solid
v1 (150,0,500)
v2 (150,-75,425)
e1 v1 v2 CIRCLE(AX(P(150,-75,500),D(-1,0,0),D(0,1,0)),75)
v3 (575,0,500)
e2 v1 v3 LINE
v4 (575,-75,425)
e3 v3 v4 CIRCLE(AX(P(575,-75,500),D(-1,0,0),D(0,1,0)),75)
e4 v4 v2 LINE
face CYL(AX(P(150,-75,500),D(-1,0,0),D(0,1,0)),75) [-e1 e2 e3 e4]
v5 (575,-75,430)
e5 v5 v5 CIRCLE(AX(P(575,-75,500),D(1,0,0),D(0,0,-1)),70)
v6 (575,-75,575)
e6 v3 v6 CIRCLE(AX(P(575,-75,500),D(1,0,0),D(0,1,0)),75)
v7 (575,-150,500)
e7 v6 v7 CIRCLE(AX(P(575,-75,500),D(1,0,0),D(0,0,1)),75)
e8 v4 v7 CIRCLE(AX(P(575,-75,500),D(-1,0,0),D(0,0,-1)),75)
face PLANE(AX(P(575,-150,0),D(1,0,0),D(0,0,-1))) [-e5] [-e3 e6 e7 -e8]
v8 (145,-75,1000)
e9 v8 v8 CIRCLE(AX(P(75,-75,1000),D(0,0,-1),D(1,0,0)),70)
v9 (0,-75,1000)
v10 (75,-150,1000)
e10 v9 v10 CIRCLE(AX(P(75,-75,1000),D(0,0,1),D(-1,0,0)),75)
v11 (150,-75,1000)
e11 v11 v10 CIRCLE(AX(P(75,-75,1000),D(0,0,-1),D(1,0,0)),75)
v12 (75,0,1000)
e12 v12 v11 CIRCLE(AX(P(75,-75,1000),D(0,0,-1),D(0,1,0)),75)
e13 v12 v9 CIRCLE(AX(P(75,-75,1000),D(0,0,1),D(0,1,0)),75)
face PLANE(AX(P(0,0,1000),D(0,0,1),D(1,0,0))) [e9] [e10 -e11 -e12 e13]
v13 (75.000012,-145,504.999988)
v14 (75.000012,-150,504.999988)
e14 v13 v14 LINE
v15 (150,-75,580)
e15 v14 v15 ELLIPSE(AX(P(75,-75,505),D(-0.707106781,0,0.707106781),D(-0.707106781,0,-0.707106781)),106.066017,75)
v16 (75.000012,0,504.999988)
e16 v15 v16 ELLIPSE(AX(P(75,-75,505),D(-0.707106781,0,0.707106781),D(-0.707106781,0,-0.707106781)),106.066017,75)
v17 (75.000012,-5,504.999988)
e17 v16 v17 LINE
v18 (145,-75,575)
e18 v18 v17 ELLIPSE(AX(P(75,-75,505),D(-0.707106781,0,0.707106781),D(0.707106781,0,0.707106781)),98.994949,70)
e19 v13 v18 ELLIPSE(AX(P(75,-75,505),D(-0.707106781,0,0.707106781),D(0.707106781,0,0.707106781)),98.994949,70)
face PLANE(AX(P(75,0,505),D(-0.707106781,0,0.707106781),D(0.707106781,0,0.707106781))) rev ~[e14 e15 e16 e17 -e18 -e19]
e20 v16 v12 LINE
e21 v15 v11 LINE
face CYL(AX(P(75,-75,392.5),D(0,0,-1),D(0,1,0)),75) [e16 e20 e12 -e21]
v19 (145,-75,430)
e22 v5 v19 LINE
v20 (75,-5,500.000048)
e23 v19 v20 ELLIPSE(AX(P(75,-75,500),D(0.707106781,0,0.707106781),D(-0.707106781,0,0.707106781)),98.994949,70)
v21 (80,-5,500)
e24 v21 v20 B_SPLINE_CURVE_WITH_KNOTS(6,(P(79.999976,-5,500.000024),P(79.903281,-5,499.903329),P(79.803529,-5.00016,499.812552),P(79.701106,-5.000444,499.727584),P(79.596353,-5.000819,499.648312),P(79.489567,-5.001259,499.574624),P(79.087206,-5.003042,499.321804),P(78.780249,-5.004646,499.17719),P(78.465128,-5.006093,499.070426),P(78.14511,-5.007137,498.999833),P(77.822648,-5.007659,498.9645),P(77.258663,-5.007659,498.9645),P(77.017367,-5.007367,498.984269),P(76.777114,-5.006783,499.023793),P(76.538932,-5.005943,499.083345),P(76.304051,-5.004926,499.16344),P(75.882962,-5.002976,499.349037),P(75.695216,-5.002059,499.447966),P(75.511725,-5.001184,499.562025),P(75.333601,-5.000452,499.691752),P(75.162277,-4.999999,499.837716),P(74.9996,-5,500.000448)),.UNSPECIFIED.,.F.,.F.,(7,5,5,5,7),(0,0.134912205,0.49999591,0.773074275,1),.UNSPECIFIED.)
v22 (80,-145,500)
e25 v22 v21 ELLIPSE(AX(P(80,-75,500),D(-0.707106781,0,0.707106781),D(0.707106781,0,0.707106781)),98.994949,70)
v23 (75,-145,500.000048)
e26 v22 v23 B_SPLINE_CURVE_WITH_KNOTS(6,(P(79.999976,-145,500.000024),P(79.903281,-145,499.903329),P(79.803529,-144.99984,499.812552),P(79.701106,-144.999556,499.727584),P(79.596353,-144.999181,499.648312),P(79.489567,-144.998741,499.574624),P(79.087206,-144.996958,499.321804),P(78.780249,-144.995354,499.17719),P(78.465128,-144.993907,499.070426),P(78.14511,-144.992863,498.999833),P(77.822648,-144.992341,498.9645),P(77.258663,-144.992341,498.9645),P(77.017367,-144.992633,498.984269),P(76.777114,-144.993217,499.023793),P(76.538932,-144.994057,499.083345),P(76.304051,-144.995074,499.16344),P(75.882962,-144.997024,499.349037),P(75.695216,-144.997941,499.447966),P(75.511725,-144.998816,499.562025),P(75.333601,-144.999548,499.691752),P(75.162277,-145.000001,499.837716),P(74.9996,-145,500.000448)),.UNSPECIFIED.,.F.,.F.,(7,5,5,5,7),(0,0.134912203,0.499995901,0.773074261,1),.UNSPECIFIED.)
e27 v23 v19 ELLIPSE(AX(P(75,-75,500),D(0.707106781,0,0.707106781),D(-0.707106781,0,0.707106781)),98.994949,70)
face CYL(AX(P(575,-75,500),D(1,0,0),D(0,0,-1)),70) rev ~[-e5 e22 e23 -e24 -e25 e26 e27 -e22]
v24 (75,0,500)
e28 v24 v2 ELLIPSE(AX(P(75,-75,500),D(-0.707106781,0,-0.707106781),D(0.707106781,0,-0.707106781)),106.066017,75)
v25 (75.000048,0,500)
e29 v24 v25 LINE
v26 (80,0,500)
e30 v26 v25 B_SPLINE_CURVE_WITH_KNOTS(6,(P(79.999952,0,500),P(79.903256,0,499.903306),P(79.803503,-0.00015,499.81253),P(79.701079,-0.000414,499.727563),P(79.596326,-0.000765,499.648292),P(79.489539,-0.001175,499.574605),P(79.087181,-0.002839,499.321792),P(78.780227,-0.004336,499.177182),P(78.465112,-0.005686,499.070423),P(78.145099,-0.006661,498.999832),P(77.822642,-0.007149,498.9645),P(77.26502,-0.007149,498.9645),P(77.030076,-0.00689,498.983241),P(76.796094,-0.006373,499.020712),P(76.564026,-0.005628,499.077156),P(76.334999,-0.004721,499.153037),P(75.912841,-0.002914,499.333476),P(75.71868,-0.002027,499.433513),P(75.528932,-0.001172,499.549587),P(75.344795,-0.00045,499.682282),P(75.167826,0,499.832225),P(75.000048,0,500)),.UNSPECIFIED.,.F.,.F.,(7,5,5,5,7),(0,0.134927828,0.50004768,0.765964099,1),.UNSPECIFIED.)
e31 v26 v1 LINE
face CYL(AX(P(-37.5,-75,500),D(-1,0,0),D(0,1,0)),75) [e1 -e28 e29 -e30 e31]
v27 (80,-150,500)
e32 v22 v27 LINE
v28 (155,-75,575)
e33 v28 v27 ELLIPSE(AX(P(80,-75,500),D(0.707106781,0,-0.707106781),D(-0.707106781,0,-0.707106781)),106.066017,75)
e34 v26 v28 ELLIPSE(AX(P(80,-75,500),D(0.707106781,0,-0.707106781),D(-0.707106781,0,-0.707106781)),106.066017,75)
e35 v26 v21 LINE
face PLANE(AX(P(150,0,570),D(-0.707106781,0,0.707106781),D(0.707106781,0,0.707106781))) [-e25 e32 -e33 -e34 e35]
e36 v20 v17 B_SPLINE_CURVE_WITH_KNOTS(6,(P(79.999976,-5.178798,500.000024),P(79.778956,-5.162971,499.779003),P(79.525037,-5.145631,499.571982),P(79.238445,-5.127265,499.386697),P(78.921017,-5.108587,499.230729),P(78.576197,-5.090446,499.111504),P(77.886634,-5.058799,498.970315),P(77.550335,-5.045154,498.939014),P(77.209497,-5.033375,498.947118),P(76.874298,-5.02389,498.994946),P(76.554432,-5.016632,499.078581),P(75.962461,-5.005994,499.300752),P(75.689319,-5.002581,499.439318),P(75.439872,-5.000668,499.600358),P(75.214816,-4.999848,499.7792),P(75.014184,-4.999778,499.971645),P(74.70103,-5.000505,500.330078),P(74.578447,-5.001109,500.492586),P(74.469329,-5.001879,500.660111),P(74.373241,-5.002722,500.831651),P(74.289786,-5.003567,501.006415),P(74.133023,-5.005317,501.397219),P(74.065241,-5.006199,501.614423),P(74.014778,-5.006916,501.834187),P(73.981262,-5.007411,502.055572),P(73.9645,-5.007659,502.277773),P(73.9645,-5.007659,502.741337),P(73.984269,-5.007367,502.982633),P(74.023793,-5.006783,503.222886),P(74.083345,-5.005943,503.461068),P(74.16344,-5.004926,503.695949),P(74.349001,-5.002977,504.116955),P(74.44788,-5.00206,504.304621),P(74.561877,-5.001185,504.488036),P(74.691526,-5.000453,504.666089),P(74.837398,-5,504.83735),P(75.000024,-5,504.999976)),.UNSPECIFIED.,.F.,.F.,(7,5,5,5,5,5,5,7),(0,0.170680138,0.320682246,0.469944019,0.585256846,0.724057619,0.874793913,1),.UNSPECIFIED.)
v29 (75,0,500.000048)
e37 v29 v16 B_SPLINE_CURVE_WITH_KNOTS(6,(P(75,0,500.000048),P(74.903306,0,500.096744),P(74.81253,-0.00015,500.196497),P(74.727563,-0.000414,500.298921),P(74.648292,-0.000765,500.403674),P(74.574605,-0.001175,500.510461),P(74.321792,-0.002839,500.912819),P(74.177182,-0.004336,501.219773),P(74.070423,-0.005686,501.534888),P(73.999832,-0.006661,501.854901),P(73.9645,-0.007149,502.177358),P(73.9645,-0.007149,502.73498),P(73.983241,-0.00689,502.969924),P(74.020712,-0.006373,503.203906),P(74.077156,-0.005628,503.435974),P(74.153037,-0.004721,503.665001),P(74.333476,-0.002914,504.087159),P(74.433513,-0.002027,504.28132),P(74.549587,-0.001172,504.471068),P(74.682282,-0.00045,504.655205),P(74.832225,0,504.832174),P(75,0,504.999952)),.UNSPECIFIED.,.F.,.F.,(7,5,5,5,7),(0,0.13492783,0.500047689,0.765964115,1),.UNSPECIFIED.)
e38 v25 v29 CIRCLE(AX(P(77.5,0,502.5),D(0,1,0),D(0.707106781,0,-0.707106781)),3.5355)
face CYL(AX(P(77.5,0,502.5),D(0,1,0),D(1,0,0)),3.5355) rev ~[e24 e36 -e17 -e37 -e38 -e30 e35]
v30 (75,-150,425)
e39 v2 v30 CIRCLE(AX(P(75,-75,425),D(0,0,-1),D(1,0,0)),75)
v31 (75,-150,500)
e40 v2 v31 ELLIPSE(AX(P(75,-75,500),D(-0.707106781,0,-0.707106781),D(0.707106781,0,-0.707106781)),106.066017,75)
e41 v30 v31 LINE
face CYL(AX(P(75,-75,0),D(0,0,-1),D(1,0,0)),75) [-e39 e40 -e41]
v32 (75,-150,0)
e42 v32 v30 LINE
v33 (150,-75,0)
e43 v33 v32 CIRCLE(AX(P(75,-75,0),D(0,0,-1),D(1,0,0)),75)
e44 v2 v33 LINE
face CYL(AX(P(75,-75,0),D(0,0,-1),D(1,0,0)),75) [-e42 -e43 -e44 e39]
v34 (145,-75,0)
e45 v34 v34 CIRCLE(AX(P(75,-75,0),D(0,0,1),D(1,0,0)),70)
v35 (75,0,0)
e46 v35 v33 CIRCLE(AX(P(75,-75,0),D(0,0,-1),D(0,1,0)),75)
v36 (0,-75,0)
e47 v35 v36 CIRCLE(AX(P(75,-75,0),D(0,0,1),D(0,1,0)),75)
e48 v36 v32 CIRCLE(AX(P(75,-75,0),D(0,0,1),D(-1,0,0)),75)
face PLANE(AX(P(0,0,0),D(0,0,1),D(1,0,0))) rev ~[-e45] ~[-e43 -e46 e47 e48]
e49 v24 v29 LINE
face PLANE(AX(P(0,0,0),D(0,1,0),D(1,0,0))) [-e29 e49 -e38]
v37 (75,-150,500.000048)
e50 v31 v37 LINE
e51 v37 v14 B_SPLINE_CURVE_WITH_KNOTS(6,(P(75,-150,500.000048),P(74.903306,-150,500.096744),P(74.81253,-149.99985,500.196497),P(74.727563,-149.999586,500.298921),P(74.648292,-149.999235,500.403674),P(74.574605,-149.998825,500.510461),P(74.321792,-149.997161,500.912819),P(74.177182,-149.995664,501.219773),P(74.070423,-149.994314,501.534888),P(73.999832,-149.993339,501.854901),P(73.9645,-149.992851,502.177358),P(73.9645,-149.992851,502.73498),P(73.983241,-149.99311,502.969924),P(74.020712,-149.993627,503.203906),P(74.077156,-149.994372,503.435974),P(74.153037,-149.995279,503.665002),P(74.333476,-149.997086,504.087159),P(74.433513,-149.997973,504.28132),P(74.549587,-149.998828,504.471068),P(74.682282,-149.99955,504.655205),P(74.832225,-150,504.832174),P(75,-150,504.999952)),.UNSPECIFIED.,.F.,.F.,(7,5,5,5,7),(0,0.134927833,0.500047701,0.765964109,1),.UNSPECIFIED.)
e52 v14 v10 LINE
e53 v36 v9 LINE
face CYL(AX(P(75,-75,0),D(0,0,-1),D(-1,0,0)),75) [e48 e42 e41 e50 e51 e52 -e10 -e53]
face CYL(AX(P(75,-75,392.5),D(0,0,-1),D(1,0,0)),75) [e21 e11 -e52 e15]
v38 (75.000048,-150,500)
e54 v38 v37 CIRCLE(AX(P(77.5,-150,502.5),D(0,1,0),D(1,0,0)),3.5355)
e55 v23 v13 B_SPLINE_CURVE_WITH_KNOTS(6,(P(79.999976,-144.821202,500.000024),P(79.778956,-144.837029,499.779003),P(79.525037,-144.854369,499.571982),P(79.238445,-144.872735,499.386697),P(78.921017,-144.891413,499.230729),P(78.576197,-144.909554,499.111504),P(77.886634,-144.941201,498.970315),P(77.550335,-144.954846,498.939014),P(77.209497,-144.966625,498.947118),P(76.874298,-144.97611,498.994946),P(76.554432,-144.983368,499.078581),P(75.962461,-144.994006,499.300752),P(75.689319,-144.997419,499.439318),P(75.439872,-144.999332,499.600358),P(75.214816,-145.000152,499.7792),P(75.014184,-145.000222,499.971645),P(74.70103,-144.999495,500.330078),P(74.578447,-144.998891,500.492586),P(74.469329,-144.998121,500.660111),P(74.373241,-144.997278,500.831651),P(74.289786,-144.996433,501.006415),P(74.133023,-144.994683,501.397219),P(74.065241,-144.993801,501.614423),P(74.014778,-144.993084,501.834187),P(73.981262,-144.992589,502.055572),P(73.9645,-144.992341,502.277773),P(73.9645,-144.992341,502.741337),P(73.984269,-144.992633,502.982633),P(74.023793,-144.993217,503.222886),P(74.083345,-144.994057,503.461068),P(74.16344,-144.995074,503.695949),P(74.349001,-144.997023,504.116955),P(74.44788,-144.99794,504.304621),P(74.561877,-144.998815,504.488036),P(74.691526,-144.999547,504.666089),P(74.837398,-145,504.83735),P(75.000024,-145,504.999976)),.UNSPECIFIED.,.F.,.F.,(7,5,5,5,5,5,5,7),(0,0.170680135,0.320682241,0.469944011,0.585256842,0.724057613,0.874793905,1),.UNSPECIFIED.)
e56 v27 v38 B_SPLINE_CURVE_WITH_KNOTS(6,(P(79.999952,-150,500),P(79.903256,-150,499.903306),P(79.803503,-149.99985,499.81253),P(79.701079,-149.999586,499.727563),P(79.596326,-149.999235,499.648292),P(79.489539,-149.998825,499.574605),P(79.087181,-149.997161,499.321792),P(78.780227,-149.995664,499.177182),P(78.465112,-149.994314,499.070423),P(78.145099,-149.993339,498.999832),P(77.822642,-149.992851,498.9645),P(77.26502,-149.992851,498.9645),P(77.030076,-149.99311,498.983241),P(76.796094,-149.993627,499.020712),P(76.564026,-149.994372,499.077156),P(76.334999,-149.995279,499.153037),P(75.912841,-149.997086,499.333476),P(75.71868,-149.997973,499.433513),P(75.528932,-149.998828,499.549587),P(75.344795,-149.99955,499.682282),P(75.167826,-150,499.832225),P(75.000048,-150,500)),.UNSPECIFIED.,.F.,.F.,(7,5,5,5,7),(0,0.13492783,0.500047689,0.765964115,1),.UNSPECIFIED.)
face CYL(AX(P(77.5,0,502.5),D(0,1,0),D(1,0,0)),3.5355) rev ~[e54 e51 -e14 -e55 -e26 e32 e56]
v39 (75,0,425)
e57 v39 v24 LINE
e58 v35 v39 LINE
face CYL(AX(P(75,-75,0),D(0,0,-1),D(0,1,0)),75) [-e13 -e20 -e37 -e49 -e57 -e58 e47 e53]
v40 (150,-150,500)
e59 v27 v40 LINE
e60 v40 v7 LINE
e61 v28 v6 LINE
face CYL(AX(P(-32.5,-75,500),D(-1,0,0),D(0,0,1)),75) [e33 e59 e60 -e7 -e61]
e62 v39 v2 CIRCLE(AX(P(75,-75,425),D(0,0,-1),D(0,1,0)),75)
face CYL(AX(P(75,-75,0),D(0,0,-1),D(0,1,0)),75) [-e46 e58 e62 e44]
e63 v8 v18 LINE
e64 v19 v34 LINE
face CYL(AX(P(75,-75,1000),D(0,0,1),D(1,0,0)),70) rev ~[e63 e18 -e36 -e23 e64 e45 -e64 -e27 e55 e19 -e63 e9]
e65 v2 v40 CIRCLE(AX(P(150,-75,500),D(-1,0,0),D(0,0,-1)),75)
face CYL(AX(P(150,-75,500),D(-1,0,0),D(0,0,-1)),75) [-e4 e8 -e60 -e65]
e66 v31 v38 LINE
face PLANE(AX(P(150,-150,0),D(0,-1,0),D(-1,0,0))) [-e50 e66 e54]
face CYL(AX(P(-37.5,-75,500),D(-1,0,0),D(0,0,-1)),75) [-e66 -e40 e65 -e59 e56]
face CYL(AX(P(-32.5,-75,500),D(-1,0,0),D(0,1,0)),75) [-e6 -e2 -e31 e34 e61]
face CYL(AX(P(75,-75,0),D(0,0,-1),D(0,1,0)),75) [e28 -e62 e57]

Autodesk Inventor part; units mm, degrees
ref_plane "YZ Plane" through (0, 0, 0) normal (1, 0, 0) x (0, 1, 0)
ref_plane "XZ Plane" through (0, 0, 0) normal (0, 1, 0) x (-1, 0, 0)
ref_plane "XY Plane" through (0, 0, 0) normal (0, 0, 1) x (1, 0, 0)
sketch "Эскиз1" plane through (0, 0, 0) normal (0, 0, 1) x (1, 0, 0)
  line L0 (0, 0) -> (150, 0)
  line L1 (150, 0) -> (150, -150)
  line L2 (150, -150) -> (0, -150)
  line L3 (0, -150) -> (0, 0)
  dimension "d0" = 150
  dimension "d1" = 150
extrude "Выдавливание1" add sketch "Эскиз1" along normal blind 1000
sketch "Эскиз2" plane through (150, -150, 0) normal (1, 0, 0) x (0, 0, -1)
  line L0 (0, 0) -> (-1000, 0) projected
  line L1 (0, 150) -> (-1000, 150) projected
  line L2 (-575, 0) -> (-425, 0)
  line L3 (-425, 0) -> (-425, 150)
  line L4 (-425, 150) -> (-575, 150)
  line L5 (-575, 150) -> (-575, 0)
  point P0 (-500, 0)
  point P1 (-500, 0)
  point P2 (-425, 0)
  dimension "d4" = 150
  dimension "d5" = 0
extrude "Выдавливание2" add sketch "Эскиз2" along normal blind 425
sketch "Эскиз3" plane through (0, 0, 0) normal (0, 1, 0) x (1, 0, 0)
  line L0 (150, -425) -> (575, -425) projected
  line L1 (150, -575) -> (575, -575) projected
  line L2 (150, -425) -> (150, -575)
  line L3 (150, -500) -> (0, -500)
  line L4 (0, 0) -> (0, -1000) projected
  line L5 (75, -500) -> (150, -575)
  line L6 (80, -500) -> (155, -575)
  line L7 (70, -500) -> (150, -580)
  line L8 (150, -575) -> (150, -1000) projected
  circle A0 centre (77.5, -502.5) radius 3.5355
  point P0 (150, -570)
  point P1 (75, -505)
  dimension "d8" = 5
  dimension "d9" = 5
extrude "Выдавливание3" cut sketch "Эскиз3" against normal blind 200 contours L2 L6 L1 | L5 A0 L6 L2 | L8 L7 A0 L5 | A0 L5 | L5 L3 A0 | L3 A0
fillet "Сопряжение1" radius 75 10 edges at (365, 0, 575) (362.5, 0, 425) (365, -150, 575) (362.5, -150, 425) (150, -150, 212.5) (150, 0, 212.5) (150, 0, 790) (150, -150, 790) (0, -150, 500) (0, 0, 500)
sketch "Эскиз4" plane through (75, -75, 1000) normal (0, 0, 1) x (1, 0, 0)
  line L0 (0, 75) -> (0, -75) projected
  circle A0 centre (0, 0) radius 70
  point P0 (-75, 75)
  dimension "d13" = 140
extrude "Выдавливание4" cut sketch "Эскиз4" against normal blind 1010
sketch "Эскиз5" plane through (575, -75, 500) normal (1, 0, 0) x (0, 0, -1)
  circle A0 centre (0, 0) radius 70
  point P0 (500, 75)
  dimension "d16" = 140
extrude "Выдавливание5" cut sketch "Эскиз5" against normal blind 500
properties part number "вставка в трубу" material "Полистирол, высокопрочный"
